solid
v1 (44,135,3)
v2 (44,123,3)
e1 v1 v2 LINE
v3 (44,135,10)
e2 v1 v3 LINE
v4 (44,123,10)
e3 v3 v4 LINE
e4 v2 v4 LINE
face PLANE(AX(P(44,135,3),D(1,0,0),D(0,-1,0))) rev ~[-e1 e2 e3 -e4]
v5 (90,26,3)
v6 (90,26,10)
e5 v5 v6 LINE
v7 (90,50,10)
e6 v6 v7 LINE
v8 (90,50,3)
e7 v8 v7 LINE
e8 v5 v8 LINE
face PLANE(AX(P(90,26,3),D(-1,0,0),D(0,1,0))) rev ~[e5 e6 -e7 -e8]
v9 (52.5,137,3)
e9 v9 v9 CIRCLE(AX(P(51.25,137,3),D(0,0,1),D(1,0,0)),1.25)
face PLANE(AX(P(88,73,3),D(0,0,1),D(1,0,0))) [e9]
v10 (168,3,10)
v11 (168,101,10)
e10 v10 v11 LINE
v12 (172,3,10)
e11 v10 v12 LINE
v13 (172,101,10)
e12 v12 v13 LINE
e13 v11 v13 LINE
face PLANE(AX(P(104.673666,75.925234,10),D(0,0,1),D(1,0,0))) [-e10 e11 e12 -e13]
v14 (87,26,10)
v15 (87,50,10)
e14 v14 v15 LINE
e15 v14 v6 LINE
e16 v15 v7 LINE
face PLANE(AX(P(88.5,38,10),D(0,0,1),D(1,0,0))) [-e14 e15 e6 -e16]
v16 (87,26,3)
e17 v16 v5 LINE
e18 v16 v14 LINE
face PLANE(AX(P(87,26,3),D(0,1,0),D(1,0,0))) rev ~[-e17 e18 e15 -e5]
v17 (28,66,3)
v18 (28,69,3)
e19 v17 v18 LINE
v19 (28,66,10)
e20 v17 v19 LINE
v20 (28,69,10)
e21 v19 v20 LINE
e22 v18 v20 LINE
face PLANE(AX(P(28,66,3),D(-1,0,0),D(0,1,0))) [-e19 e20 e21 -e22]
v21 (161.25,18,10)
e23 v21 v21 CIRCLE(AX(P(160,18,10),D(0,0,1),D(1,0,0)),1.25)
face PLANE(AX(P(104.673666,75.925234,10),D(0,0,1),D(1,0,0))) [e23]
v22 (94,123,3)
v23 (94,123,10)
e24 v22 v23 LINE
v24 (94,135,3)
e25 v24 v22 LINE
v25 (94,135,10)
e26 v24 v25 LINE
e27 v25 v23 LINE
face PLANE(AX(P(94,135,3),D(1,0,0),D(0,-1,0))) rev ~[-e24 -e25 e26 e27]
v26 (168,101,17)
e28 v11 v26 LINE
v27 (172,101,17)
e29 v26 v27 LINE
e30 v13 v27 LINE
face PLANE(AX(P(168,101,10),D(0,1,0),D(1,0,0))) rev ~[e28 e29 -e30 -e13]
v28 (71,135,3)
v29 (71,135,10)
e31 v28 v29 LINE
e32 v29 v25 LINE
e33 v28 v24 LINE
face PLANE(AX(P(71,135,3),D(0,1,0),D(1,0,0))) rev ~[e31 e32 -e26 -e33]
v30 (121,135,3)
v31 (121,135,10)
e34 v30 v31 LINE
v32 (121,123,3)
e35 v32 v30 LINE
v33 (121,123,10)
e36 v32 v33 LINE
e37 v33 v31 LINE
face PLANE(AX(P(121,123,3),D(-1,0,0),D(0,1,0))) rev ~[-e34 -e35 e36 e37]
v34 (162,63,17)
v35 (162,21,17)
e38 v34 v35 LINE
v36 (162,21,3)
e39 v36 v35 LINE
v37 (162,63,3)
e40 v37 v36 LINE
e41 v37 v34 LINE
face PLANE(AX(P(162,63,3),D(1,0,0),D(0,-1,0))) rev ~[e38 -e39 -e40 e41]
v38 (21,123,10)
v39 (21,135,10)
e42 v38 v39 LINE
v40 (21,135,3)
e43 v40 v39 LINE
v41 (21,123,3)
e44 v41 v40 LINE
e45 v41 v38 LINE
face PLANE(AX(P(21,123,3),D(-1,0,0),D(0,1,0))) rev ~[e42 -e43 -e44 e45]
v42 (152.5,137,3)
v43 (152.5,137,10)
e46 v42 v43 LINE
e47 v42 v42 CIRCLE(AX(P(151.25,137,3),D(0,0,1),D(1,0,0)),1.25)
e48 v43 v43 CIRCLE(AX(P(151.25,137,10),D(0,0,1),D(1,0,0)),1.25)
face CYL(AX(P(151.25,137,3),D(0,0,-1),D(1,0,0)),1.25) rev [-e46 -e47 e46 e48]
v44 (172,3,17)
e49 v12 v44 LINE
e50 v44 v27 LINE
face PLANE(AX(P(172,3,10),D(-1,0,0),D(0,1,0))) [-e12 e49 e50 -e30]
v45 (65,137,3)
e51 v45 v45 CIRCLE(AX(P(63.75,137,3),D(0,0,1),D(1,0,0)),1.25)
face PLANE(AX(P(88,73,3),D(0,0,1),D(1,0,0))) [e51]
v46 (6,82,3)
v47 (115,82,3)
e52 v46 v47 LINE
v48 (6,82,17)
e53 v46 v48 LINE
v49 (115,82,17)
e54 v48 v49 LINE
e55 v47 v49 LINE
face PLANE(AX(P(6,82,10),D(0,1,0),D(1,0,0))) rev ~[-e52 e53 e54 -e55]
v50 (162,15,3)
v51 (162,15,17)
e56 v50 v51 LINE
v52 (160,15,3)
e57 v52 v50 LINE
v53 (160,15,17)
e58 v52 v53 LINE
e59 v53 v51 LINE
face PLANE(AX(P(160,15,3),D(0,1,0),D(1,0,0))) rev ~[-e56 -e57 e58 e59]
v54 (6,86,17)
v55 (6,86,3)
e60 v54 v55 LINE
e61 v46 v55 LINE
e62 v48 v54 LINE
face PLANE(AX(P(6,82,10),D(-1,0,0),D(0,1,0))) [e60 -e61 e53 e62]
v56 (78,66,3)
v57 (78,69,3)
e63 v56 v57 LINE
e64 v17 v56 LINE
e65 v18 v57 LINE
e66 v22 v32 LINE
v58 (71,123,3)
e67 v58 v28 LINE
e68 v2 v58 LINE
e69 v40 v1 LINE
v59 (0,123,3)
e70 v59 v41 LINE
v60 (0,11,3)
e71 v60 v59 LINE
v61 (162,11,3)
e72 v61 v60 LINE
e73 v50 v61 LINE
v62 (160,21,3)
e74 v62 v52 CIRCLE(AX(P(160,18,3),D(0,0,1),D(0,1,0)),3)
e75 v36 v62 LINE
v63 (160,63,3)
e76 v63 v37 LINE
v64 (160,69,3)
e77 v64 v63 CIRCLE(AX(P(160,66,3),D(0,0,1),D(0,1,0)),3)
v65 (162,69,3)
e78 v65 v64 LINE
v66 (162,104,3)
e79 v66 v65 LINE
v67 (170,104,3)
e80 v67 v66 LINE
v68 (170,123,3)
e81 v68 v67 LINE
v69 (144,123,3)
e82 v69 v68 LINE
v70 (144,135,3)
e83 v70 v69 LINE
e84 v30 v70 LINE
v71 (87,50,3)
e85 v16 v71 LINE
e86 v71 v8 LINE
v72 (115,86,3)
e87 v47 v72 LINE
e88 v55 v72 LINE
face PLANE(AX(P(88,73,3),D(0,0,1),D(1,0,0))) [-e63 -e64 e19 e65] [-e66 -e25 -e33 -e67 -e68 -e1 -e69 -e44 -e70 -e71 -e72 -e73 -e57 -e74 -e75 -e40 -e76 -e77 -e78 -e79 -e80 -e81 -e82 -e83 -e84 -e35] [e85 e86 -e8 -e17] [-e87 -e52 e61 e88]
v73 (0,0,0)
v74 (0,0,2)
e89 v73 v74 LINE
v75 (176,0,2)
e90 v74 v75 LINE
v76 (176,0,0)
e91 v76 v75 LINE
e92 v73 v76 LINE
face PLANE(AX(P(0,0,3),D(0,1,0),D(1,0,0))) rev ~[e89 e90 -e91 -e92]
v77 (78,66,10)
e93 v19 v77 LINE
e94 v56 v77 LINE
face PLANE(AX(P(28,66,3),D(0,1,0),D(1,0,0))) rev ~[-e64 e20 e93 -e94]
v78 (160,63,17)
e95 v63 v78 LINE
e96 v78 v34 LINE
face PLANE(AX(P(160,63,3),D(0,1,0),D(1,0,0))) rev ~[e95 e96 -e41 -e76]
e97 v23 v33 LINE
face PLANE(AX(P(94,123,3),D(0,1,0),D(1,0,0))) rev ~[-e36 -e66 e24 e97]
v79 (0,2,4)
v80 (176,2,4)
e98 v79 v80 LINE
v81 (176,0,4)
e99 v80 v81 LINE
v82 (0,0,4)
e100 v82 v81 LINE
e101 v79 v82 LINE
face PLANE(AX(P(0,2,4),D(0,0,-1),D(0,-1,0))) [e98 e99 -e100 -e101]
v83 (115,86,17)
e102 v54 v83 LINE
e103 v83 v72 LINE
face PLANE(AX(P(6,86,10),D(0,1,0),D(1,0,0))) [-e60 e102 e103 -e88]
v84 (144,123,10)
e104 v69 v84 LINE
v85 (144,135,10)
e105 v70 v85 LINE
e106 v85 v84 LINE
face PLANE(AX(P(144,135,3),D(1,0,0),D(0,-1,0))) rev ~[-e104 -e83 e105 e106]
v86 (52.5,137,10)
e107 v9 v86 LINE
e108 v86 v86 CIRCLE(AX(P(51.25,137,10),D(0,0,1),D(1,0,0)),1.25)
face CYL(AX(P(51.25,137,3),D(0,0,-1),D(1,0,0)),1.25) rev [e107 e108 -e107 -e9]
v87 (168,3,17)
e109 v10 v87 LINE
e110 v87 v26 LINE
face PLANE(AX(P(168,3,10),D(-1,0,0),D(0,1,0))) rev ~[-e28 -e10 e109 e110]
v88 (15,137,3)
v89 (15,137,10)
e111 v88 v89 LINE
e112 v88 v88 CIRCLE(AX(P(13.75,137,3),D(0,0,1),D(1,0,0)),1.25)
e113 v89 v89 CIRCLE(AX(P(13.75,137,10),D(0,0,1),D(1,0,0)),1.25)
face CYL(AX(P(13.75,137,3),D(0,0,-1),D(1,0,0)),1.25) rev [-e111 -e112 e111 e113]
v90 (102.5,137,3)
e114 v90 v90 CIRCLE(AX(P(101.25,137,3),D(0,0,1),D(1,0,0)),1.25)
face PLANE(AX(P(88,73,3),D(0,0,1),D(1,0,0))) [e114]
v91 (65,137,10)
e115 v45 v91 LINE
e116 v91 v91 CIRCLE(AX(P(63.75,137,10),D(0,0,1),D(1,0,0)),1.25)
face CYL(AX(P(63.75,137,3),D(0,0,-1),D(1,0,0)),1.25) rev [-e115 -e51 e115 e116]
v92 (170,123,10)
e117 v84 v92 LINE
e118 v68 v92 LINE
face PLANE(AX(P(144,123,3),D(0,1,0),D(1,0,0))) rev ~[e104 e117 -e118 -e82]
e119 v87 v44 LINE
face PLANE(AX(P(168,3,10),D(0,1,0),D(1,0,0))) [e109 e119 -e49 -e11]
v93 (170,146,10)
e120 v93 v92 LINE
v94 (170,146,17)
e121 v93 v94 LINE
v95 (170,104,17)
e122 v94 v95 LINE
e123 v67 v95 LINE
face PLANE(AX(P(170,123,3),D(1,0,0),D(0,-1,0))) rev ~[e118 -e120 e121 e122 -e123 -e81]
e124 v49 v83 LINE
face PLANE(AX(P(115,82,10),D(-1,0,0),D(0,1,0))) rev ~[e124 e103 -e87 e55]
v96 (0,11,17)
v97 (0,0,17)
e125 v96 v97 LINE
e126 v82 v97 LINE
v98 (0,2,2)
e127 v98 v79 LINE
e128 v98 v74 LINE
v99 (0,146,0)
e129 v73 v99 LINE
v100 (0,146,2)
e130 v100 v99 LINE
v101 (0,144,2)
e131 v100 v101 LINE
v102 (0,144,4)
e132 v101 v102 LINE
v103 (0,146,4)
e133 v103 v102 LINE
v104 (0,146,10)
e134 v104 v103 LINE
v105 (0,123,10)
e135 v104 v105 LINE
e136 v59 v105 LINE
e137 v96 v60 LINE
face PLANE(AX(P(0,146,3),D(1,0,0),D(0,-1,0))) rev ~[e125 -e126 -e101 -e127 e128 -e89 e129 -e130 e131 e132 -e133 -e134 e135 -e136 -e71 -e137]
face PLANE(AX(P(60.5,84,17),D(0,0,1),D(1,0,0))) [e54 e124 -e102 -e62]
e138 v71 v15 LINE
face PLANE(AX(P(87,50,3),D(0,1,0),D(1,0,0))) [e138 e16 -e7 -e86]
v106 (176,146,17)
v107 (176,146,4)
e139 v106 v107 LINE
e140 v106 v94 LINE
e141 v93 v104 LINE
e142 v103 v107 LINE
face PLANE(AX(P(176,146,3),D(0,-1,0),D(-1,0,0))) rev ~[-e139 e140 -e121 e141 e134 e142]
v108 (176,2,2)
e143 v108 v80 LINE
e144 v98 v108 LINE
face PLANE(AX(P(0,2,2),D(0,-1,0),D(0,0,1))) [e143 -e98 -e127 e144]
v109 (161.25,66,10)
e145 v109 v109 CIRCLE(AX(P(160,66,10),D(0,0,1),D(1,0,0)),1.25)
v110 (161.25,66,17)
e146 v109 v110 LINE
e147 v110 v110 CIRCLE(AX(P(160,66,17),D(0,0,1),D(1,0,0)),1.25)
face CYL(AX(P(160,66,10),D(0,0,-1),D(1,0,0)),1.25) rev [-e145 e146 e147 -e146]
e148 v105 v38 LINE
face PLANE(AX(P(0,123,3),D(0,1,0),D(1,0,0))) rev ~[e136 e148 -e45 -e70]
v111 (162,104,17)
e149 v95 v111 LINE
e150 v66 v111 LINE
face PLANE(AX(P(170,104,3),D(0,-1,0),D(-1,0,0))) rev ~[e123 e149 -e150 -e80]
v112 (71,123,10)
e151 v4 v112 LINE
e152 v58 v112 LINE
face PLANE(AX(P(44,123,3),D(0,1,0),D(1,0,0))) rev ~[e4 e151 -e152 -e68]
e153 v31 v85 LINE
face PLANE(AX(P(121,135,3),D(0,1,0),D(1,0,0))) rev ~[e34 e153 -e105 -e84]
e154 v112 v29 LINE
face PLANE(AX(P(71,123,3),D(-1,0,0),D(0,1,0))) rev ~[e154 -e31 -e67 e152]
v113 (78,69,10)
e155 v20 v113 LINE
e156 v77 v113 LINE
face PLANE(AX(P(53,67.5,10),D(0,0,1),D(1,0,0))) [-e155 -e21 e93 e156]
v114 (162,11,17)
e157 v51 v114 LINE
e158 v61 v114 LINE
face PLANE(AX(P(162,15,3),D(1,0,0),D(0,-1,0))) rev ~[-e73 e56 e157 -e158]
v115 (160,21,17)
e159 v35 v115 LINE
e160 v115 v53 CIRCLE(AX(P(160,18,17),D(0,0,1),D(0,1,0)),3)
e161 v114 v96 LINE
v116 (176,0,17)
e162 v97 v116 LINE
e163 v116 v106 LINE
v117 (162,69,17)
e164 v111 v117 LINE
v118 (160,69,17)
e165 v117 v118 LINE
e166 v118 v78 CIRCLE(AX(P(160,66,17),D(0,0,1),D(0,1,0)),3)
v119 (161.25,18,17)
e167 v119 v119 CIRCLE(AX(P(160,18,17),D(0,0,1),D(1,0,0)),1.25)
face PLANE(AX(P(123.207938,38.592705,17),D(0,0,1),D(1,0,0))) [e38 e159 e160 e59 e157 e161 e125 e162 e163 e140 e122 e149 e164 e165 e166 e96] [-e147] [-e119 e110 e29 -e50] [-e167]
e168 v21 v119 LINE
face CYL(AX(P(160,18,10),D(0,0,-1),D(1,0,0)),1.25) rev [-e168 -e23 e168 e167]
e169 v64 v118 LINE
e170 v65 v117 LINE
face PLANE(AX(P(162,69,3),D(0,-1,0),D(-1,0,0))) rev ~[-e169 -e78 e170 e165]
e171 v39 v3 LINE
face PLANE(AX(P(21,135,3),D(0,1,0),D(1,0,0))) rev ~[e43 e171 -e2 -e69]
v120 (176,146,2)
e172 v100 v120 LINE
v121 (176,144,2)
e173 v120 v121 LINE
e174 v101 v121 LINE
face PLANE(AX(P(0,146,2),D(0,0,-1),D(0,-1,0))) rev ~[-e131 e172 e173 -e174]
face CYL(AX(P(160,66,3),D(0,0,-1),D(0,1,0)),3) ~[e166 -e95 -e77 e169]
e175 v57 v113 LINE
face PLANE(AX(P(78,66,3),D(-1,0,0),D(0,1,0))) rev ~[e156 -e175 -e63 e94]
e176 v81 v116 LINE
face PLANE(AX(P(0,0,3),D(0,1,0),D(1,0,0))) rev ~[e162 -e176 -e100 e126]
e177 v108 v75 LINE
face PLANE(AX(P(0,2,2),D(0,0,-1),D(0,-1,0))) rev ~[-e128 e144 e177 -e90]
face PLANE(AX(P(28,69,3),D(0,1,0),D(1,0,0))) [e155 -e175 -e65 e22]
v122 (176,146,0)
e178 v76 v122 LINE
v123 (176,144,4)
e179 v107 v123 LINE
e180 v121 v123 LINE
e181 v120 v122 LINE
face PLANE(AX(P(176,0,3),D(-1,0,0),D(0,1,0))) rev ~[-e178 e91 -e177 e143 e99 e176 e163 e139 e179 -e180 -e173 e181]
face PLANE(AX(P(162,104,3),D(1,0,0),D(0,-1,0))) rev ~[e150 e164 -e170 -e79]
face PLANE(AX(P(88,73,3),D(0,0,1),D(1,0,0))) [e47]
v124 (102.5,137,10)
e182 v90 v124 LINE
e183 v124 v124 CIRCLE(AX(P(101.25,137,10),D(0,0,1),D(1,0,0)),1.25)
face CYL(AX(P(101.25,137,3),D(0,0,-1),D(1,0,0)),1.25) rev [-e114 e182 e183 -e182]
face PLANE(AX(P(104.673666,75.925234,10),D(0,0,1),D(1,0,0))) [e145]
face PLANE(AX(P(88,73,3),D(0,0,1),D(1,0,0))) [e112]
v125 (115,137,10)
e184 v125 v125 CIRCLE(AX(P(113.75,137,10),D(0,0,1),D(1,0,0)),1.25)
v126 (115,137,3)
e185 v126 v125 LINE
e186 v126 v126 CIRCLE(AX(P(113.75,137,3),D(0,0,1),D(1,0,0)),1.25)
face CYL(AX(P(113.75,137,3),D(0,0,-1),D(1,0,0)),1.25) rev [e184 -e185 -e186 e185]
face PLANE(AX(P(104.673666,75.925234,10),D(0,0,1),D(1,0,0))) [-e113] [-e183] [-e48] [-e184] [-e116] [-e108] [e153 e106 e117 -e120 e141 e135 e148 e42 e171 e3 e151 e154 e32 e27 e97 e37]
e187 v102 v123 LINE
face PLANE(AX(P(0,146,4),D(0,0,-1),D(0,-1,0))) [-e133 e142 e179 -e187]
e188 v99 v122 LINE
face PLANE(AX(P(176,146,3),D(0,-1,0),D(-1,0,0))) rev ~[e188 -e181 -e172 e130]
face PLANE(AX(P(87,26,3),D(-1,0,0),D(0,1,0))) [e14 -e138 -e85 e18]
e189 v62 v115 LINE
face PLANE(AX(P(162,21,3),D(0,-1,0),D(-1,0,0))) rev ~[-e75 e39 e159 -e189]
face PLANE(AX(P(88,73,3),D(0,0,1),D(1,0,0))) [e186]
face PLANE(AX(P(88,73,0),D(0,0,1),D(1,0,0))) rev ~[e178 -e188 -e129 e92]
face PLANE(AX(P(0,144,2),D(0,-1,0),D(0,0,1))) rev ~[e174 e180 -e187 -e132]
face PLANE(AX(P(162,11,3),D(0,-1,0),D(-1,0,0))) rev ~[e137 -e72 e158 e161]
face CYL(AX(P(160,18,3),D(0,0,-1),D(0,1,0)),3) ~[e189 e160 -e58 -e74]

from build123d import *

# Parameters (mm, degrees)
F0_W      = 176
F0_H      = 146
F1_DEPTH  = 3
F2_W      = 50
F2_H      = 3
F2_W_2    = 3
F2_H_2    = 24
F2_W_3    = 109
F2_H_3    = 4
F2_R      = 1.25
F3_DEPTH  = 7
F3_FACE_W = 109
F3_FACE_H = 4
F4_R      = 1.25
F4_W      = 4
F4_H      = 98
F5_DEPTH  = 7
F6_W      = 2
F6_H      = 2
F7_DEPTH  = 176


# Not quite as in the source:
# - a feature names something its author has since deleted; it is built from what else it names


with BuildPart() as f1:
    # F0 (on Top) → F1 (new body)
    with BuildSketch(Plane.XY):
        with Locations((88, 73)):
            Rectangle(F0_W, F0_H)
    extrude(amount=F1_DEPTH)

    # F2 (on face) → F3 (join)
    with BuildSketch(Plane.XY.offset(3)):
        with Locations((53, 67.5)):
            Rectangle(F2_W, F2_H)
        with Locations((88.5, 38)):
            Rectangle(F2_W_2, F2_H_2)
        with Locations((60.5, 84)):
            Rectangle(F2_W_3, F2_H_3)
        with BuildLine():
            Line((0, 123), (6, 123))
            Line((6, 123), (21, 123))
            Line((21, 123), (21, 135))
            Line((21, 135), (44, 135))
            Line((44, 135), (44, 123))
            Line((44, 123), (71, 123))
            Line((71, 123), (71, 135))
            Line((71, 135), (94, 135))
            Line((94, 135), (94, 123))
            Line((94, 123), (121, 123))
            Line((121, 123), (121, 135))
            Line((121, 135), (144, 135))
            Line((144, 135), (144, 123))
            Line((144, 123), (170, 123))
            Line((170, 123), (170, 104))
            Line((170, 104), (162, 104))
            Line((162, 104), (162, 69))
            Line((162, 69), (160, 69))
            ThreePointArc((160, 69), (157, 66), (160, 63))
            Line((160, 63), (162, 63))
            Line((162, 63), (162, 21))
            Line((162, 21), (160, 21))
            ThreePointArc((160, 21), (157, 18), (160, 15))
            Line((160, 15), (162, 15))
            Line((162, 15), (162, 11))
            Line((162, 11), (0, 11))
            Line((0, 11), (0, 0))
            Line((0, 0), (176, 0))
            Line((176, 0), (176, 146))
            Line((176, 146), (0, 146))
            Line((0, 146), (0, 123))
        make_face()
        with Locations((13.75, 137)):
            Circle(F2_R, mode=Mode.SUBTRACT)
        with Locations((51.25, 137)):
            Circle(F2_R, mode=Mode.SUBTRACT)
        with Locations((63.75, 137)):
            Circle(F2_R, mode=Mode.SUBTRACT)
        with Locations((101.25, 137)):
            Circle(F2_R, mode=Mode.SUBTRACT)
        with Locations((113.75, 137)):
            Circle(F2_R, mode=Mode.SUBTRACT)
        with Locations((151.25, 137)):
            Circle(F2_R, mode=Mode.SUBTRACT)
    extrude(amount=F3_DEPTH)

    # F3_face (on face) + F4 (on face) → F5 (join)
    with BuildSketch(Plane(origin=(60.5, 84, 10), x_dir=(1, 0, 0), z_dir=(0, 0, 1))):
        Rectangle(F3_FACE_W, F3_FACE_H)
    with BuildSketch(Plane.XY.offset(10)):
        with BuildLine():
            Line((170, 146), (170, 123))
            Line((170, 123), (170, 104))
            Line((170, 104), (162, 104))
            Line((162, 104), (162, 69))
            Line((162, 69), (160, 69))
            ThreePointArc((160, 69), (157, 66), (160, 63))
            Line((160, 63), (162, 63))
            Line((162, 63), (162, 21))
            Line((162, 21), (160, 21))
            ThreePointArc((160, 21), (157, 18), (160, 15))
            Line((160, 15), (162, 15))
            Line((162, 15), (162, 11))
            Line((162, 11), (0, 11))
            Line((0, 11), (0, 0))
            Line((0, 0), (176, 0))
            Line((176, 0), (176, 146))
            Line((176, 146), (170, 146))
        make_face()
        with Locations((160, 18)):
            Circle(F4_R, mode=Mode.SUBTRACT)
        with Locations((170, 52)):
            Rectangle(F4_W, F4_H, mode=Mode.SUBTRACT)
        with Locations((160, 66)):
            Circle(F4_R, mode=Mode.SUBTRACT)
    extrude(amount=F5_DEPTH)

    # F6 (on face) → F7 (cut)
    with BuildSketch(Plane(origin=(0, 0, 0), x_dir=(0, -1, 0), z_dir=(-1, 0, 0))):
        with Locations((-145, 3)):
            Rectangle(F6_W, F6_H)
        with Locations((-1, 3)):
            Rectangle(F6_W, F6_H)
    extrude(amount=-F7_DEPTH, mode=Mode.SUBTRACT)


solid = f1.part
